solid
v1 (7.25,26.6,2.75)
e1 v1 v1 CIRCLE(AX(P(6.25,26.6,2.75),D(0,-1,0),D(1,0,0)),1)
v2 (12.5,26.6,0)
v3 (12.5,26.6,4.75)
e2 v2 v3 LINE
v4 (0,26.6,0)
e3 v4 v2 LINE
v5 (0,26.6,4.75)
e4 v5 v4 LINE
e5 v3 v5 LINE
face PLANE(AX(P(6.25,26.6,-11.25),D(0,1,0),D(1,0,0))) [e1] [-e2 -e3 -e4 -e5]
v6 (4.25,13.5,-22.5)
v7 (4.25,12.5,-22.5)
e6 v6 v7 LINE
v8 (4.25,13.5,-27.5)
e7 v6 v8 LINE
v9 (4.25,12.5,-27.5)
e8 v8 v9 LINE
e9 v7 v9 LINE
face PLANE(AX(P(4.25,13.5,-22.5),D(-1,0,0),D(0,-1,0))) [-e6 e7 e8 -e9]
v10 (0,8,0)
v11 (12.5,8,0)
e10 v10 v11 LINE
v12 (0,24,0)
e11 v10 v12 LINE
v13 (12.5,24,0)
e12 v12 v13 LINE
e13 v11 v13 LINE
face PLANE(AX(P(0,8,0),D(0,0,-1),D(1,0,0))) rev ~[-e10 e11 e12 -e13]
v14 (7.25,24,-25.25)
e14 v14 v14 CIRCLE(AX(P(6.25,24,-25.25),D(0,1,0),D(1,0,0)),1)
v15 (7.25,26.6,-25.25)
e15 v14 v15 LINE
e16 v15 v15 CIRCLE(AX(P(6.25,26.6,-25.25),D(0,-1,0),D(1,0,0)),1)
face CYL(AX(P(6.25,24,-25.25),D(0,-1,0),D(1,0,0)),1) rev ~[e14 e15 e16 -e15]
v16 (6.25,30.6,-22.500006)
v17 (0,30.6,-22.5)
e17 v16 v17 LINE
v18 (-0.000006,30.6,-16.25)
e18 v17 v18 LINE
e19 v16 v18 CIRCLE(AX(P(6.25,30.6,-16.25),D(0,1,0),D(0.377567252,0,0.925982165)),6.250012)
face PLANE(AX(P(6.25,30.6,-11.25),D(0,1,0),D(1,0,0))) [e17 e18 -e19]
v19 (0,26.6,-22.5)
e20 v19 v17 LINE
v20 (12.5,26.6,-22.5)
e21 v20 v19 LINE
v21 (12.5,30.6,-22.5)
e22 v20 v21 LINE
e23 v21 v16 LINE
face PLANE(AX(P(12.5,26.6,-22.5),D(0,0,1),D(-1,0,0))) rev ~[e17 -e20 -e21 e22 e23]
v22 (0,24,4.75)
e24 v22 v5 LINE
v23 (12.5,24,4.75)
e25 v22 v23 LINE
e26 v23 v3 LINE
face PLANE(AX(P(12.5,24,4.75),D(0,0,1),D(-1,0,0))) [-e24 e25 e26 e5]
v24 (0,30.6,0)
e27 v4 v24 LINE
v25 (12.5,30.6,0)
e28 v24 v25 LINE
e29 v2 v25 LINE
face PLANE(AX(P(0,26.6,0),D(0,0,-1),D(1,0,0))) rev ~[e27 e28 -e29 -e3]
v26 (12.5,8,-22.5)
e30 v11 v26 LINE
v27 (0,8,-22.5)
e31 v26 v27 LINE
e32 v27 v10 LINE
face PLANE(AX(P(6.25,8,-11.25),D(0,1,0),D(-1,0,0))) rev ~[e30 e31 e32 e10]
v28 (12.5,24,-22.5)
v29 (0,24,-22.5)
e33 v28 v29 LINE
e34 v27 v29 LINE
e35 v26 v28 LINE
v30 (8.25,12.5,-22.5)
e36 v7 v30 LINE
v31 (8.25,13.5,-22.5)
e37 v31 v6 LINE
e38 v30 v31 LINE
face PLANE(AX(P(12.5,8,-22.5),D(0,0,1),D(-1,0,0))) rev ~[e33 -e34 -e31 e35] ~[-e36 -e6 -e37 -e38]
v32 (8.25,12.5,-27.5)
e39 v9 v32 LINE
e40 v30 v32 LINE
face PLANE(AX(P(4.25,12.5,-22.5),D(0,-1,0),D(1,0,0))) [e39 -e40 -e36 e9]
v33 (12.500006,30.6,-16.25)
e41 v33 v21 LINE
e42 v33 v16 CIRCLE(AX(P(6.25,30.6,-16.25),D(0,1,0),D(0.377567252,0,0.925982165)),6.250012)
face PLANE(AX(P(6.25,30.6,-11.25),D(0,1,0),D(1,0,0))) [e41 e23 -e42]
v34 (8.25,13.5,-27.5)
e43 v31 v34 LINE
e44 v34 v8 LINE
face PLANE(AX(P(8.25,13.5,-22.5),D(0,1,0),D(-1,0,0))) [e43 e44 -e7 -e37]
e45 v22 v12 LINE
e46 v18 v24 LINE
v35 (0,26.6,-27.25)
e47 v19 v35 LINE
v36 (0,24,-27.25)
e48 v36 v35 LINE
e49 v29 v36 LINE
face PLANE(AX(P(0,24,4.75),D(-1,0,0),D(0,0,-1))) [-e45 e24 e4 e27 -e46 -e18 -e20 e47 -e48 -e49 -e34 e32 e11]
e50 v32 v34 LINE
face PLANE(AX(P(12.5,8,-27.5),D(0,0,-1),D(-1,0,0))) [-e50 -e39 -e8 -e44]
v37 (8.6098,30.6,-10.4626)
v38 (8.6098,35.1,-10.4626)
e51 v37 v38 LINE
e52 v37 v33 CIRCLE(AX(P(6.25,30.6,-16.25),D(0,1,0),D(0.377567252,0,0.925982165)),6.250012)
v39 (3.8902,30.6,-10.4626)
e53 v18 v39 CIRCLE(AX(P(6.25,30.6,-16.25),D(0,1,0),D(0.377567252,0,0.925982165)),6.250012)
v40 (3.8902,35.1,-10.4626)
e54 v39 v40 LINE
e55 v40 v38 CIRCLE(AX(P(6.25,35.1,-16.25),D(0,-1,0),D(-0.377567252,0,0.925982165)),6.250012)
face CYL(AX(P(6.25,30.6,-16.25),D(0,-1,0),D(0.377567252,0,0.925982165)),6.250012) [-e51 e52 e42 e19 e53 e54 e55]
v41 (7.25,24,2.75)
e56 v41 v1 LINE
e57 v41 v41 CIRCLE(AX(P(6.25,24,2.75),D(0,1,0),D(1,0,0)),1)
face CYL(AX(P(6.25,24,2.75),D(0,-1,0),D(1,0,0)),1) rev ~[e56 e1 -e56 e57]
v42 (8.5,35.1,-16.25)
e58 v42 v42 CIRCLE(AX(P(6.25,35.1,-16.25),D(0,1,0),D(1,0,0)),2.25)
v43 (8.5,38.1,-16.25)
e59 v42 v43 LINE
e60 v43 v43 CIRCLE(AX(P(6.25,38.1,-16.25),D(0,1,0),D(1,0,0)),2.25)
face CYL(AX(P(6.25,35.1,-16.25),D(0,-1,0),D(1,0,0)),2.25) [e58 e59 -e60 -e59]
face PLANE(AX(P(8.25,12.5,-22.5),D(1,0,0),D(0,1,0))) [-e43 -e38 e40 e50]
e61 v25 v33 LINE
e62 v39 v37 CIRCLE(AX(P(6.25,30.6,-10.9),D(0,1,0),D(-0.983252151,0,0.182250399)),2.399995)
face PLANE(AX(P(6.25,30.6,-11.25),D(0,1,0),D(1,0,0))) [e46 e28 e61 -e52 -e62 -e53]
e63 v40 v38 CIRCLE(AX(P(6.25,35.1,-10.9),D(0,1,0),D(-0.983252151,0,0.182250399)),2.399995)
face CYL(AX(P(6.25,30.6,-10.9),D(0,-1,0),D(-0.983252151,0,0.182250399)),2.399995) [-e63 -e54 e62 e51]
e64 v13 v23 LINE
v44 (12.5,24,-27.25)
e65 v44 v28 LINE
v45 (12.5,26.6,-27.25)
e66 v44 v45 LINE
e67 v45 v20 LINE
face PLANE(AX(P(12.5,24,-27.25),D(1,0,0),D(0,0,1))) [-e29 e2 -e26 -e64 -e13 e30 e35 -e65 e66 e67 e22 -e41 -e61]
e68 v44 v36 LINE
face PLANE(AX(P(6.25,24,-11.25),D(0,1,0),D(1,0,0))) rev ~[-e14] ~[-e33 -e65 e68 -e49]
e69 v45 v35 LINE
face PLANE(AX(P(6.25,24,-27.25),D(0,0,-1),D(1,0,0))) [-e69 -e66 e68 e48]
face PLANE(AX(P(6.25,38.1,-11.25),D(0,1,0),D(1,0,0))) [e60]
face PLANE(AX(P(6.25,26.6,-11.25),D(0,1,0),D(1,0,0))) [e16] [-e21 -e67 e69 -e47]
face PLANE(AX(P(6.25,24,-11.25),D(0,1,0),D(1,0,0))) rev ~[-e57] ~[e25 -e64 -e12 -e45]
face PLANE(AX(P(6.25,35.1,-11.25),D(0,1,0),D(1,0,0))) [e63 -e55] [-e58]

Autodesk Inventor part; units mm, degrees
ref_plane "YZ Plane" through (0, 0, 0) normal (1, 0, 0) x (0, 1, 0)
ref_plane "XZ Plane" through (0, 0, 0) normal (0, 1, 0) x (-1, 0, 0)
ref_plane "XY Plane" through (0, 0, 0) normal (0, 0, 1) x (1, 0, 0)
sketch "Sketch1" plane through (0, 0, 0) normal (0, 1, 0) x (-1, 0, 0)
  line L0 (12.5, 22.5) -> (-12.5, 22.5)
  line L1 (-12.5, 22.5) -> (-12.5, -22.5)
  line L2 (-12.5, -22.5) -> (12.5, -22.5)
  line L3 (12.5, -22.5) -> (12.5, 22.5)
  line L4 (12.5, 22.5) -> (-12.5, -22.5) construction
  line L5 (-12.5, 22.5) -> (12.5, -22.5) construction
  point P0 (0, 0)
  dimension "d0" = 25
  dimension "d1" = 45
extrude "Extrusion1" add sketch "Sketch1" along normal blind 32
sketch "Sketch2" plane through (0, 32, 0) normal (0, 1, 0) x (1, 0, 0)
  line L0 (12.5, -32) -> (-12.5, -32)
  line L1 (-12.5, -32) -> (-12.5, 32)
  line L2 (-12.5, 32) -> (12.5, 32)
  line L3 (12.5, 32) -> (12.5, -32)
  line L4 (12.5, -32) -> (-12.5, 32) construction
  line L5 (-12.5, -32) -> (12.5, 32) construction
  line L6 (0, -32) -> (0, -28)
  line L7 (0, 32) -> (0, 28)
  circle A0 centre (0, -28) radius 2
  circle A1 centre (0, 28) radius 2
  point P0 (0, 0)
  dimension "d4" = 64
  dimension "d5" = 4
  dimension "d6" = 4
  dimension "d7" = 4
  dimension "d8" = 4
extrude "Extrusion2" add sketch "Sketch2" along normal blind 5.2
sketch "Sketch3" plane through (0, 37.2, 0) normal (0, 1, 0) x (1, 0, 0)
  line L0 (12.5, 22.5) -> (-12.5, 22.5) projected
  line L1 (-12.5, -22.5) -> (12.5, -22.5)
  line L2 (12.5, -22.5) -> (12.5, 22.5)
  line L3 (12.5, 22.5) -> (-12.5, 22.5)
  line L4 (-12.5, 22.5) -> (-12.5, -22.5)
  line L5 (-12.5, -22.5) -> (12.5, 22.5) construction
  line L6 (12.5, -22.5) -> (-12.5, 22.5) construction
  point P0 (0, 0)
extrude "Extrusion3" add sketch "Sketch3" along normal blind 8
sketch "Sketch4" plane through (0, 45.2, 0) normal (0, 1, 0) x (1, 0, 0)
  line L0 (-12.5, 22.5) -> (-12.5, -22.5) projected
  line L1 (12.5, 22.5) -> (-12.5, 22.5) projected
  line L2 (12.5, -22.5) -> (12.5, 22.5) projected
  arc A0 (4.7196, -1.5748) -> (-4.7196, -1.5748) centre (0, 10) ccw
  line L3 (-12.5, 22.5) -> (12.5, 22.5) projected
  arc A1 (-4.7196, -1.5748) -> (4.7196, -1.5748) centre (0, -0.7) ccw
  point P0 (0, 0)
extrude "Extrusion4" add sketch "Sketch4" along normal blind 9 contours A0 A1
sketch "Sketch5" plane through (0, 54.2, 0) normal (0, 1, 0) x (1, 0, 0)
  arc A0 (4.7196, -1.5748) -> (-4.7196, -1.5748) centre (0, 10) ccw projected
  circle A1 centre (0, 10) radius 4.5
  point P0 (0, 0)
  dimension "d18" = 9
extrude "Extrusion5" add sketch "Sketch5" along normal blind 6
sketch "Sketch6" plane through (12.5, 0, -22.5) normal (0, 0, -1) x (-1, 0, 0)
  line L0 (8.5, 11) -> (16.5, 11)
  line L1 (16.5, 11) -> (16.5, 9)
  line L2 (16.5, 9) -> (8.5, 9)
  line L3 (8.5, 9) -> (8.5, 11)
  line L4 (8.5, 11) -> (16.5, 9) construction
  line L5 (16.5, 11) -> (8.5, 9) construction
  point P0 (12.5, 0)
  dimension "d22" = 8
  dimension "d23" = 2
extrude "Extrusion6" add sketch "Sketch6" along normal blind 10
scale "Scale1" factors (0.5, 0.5, 0.5) then translate (6.25, 8, -11.25) bodies 1
properties part number "Servo"
